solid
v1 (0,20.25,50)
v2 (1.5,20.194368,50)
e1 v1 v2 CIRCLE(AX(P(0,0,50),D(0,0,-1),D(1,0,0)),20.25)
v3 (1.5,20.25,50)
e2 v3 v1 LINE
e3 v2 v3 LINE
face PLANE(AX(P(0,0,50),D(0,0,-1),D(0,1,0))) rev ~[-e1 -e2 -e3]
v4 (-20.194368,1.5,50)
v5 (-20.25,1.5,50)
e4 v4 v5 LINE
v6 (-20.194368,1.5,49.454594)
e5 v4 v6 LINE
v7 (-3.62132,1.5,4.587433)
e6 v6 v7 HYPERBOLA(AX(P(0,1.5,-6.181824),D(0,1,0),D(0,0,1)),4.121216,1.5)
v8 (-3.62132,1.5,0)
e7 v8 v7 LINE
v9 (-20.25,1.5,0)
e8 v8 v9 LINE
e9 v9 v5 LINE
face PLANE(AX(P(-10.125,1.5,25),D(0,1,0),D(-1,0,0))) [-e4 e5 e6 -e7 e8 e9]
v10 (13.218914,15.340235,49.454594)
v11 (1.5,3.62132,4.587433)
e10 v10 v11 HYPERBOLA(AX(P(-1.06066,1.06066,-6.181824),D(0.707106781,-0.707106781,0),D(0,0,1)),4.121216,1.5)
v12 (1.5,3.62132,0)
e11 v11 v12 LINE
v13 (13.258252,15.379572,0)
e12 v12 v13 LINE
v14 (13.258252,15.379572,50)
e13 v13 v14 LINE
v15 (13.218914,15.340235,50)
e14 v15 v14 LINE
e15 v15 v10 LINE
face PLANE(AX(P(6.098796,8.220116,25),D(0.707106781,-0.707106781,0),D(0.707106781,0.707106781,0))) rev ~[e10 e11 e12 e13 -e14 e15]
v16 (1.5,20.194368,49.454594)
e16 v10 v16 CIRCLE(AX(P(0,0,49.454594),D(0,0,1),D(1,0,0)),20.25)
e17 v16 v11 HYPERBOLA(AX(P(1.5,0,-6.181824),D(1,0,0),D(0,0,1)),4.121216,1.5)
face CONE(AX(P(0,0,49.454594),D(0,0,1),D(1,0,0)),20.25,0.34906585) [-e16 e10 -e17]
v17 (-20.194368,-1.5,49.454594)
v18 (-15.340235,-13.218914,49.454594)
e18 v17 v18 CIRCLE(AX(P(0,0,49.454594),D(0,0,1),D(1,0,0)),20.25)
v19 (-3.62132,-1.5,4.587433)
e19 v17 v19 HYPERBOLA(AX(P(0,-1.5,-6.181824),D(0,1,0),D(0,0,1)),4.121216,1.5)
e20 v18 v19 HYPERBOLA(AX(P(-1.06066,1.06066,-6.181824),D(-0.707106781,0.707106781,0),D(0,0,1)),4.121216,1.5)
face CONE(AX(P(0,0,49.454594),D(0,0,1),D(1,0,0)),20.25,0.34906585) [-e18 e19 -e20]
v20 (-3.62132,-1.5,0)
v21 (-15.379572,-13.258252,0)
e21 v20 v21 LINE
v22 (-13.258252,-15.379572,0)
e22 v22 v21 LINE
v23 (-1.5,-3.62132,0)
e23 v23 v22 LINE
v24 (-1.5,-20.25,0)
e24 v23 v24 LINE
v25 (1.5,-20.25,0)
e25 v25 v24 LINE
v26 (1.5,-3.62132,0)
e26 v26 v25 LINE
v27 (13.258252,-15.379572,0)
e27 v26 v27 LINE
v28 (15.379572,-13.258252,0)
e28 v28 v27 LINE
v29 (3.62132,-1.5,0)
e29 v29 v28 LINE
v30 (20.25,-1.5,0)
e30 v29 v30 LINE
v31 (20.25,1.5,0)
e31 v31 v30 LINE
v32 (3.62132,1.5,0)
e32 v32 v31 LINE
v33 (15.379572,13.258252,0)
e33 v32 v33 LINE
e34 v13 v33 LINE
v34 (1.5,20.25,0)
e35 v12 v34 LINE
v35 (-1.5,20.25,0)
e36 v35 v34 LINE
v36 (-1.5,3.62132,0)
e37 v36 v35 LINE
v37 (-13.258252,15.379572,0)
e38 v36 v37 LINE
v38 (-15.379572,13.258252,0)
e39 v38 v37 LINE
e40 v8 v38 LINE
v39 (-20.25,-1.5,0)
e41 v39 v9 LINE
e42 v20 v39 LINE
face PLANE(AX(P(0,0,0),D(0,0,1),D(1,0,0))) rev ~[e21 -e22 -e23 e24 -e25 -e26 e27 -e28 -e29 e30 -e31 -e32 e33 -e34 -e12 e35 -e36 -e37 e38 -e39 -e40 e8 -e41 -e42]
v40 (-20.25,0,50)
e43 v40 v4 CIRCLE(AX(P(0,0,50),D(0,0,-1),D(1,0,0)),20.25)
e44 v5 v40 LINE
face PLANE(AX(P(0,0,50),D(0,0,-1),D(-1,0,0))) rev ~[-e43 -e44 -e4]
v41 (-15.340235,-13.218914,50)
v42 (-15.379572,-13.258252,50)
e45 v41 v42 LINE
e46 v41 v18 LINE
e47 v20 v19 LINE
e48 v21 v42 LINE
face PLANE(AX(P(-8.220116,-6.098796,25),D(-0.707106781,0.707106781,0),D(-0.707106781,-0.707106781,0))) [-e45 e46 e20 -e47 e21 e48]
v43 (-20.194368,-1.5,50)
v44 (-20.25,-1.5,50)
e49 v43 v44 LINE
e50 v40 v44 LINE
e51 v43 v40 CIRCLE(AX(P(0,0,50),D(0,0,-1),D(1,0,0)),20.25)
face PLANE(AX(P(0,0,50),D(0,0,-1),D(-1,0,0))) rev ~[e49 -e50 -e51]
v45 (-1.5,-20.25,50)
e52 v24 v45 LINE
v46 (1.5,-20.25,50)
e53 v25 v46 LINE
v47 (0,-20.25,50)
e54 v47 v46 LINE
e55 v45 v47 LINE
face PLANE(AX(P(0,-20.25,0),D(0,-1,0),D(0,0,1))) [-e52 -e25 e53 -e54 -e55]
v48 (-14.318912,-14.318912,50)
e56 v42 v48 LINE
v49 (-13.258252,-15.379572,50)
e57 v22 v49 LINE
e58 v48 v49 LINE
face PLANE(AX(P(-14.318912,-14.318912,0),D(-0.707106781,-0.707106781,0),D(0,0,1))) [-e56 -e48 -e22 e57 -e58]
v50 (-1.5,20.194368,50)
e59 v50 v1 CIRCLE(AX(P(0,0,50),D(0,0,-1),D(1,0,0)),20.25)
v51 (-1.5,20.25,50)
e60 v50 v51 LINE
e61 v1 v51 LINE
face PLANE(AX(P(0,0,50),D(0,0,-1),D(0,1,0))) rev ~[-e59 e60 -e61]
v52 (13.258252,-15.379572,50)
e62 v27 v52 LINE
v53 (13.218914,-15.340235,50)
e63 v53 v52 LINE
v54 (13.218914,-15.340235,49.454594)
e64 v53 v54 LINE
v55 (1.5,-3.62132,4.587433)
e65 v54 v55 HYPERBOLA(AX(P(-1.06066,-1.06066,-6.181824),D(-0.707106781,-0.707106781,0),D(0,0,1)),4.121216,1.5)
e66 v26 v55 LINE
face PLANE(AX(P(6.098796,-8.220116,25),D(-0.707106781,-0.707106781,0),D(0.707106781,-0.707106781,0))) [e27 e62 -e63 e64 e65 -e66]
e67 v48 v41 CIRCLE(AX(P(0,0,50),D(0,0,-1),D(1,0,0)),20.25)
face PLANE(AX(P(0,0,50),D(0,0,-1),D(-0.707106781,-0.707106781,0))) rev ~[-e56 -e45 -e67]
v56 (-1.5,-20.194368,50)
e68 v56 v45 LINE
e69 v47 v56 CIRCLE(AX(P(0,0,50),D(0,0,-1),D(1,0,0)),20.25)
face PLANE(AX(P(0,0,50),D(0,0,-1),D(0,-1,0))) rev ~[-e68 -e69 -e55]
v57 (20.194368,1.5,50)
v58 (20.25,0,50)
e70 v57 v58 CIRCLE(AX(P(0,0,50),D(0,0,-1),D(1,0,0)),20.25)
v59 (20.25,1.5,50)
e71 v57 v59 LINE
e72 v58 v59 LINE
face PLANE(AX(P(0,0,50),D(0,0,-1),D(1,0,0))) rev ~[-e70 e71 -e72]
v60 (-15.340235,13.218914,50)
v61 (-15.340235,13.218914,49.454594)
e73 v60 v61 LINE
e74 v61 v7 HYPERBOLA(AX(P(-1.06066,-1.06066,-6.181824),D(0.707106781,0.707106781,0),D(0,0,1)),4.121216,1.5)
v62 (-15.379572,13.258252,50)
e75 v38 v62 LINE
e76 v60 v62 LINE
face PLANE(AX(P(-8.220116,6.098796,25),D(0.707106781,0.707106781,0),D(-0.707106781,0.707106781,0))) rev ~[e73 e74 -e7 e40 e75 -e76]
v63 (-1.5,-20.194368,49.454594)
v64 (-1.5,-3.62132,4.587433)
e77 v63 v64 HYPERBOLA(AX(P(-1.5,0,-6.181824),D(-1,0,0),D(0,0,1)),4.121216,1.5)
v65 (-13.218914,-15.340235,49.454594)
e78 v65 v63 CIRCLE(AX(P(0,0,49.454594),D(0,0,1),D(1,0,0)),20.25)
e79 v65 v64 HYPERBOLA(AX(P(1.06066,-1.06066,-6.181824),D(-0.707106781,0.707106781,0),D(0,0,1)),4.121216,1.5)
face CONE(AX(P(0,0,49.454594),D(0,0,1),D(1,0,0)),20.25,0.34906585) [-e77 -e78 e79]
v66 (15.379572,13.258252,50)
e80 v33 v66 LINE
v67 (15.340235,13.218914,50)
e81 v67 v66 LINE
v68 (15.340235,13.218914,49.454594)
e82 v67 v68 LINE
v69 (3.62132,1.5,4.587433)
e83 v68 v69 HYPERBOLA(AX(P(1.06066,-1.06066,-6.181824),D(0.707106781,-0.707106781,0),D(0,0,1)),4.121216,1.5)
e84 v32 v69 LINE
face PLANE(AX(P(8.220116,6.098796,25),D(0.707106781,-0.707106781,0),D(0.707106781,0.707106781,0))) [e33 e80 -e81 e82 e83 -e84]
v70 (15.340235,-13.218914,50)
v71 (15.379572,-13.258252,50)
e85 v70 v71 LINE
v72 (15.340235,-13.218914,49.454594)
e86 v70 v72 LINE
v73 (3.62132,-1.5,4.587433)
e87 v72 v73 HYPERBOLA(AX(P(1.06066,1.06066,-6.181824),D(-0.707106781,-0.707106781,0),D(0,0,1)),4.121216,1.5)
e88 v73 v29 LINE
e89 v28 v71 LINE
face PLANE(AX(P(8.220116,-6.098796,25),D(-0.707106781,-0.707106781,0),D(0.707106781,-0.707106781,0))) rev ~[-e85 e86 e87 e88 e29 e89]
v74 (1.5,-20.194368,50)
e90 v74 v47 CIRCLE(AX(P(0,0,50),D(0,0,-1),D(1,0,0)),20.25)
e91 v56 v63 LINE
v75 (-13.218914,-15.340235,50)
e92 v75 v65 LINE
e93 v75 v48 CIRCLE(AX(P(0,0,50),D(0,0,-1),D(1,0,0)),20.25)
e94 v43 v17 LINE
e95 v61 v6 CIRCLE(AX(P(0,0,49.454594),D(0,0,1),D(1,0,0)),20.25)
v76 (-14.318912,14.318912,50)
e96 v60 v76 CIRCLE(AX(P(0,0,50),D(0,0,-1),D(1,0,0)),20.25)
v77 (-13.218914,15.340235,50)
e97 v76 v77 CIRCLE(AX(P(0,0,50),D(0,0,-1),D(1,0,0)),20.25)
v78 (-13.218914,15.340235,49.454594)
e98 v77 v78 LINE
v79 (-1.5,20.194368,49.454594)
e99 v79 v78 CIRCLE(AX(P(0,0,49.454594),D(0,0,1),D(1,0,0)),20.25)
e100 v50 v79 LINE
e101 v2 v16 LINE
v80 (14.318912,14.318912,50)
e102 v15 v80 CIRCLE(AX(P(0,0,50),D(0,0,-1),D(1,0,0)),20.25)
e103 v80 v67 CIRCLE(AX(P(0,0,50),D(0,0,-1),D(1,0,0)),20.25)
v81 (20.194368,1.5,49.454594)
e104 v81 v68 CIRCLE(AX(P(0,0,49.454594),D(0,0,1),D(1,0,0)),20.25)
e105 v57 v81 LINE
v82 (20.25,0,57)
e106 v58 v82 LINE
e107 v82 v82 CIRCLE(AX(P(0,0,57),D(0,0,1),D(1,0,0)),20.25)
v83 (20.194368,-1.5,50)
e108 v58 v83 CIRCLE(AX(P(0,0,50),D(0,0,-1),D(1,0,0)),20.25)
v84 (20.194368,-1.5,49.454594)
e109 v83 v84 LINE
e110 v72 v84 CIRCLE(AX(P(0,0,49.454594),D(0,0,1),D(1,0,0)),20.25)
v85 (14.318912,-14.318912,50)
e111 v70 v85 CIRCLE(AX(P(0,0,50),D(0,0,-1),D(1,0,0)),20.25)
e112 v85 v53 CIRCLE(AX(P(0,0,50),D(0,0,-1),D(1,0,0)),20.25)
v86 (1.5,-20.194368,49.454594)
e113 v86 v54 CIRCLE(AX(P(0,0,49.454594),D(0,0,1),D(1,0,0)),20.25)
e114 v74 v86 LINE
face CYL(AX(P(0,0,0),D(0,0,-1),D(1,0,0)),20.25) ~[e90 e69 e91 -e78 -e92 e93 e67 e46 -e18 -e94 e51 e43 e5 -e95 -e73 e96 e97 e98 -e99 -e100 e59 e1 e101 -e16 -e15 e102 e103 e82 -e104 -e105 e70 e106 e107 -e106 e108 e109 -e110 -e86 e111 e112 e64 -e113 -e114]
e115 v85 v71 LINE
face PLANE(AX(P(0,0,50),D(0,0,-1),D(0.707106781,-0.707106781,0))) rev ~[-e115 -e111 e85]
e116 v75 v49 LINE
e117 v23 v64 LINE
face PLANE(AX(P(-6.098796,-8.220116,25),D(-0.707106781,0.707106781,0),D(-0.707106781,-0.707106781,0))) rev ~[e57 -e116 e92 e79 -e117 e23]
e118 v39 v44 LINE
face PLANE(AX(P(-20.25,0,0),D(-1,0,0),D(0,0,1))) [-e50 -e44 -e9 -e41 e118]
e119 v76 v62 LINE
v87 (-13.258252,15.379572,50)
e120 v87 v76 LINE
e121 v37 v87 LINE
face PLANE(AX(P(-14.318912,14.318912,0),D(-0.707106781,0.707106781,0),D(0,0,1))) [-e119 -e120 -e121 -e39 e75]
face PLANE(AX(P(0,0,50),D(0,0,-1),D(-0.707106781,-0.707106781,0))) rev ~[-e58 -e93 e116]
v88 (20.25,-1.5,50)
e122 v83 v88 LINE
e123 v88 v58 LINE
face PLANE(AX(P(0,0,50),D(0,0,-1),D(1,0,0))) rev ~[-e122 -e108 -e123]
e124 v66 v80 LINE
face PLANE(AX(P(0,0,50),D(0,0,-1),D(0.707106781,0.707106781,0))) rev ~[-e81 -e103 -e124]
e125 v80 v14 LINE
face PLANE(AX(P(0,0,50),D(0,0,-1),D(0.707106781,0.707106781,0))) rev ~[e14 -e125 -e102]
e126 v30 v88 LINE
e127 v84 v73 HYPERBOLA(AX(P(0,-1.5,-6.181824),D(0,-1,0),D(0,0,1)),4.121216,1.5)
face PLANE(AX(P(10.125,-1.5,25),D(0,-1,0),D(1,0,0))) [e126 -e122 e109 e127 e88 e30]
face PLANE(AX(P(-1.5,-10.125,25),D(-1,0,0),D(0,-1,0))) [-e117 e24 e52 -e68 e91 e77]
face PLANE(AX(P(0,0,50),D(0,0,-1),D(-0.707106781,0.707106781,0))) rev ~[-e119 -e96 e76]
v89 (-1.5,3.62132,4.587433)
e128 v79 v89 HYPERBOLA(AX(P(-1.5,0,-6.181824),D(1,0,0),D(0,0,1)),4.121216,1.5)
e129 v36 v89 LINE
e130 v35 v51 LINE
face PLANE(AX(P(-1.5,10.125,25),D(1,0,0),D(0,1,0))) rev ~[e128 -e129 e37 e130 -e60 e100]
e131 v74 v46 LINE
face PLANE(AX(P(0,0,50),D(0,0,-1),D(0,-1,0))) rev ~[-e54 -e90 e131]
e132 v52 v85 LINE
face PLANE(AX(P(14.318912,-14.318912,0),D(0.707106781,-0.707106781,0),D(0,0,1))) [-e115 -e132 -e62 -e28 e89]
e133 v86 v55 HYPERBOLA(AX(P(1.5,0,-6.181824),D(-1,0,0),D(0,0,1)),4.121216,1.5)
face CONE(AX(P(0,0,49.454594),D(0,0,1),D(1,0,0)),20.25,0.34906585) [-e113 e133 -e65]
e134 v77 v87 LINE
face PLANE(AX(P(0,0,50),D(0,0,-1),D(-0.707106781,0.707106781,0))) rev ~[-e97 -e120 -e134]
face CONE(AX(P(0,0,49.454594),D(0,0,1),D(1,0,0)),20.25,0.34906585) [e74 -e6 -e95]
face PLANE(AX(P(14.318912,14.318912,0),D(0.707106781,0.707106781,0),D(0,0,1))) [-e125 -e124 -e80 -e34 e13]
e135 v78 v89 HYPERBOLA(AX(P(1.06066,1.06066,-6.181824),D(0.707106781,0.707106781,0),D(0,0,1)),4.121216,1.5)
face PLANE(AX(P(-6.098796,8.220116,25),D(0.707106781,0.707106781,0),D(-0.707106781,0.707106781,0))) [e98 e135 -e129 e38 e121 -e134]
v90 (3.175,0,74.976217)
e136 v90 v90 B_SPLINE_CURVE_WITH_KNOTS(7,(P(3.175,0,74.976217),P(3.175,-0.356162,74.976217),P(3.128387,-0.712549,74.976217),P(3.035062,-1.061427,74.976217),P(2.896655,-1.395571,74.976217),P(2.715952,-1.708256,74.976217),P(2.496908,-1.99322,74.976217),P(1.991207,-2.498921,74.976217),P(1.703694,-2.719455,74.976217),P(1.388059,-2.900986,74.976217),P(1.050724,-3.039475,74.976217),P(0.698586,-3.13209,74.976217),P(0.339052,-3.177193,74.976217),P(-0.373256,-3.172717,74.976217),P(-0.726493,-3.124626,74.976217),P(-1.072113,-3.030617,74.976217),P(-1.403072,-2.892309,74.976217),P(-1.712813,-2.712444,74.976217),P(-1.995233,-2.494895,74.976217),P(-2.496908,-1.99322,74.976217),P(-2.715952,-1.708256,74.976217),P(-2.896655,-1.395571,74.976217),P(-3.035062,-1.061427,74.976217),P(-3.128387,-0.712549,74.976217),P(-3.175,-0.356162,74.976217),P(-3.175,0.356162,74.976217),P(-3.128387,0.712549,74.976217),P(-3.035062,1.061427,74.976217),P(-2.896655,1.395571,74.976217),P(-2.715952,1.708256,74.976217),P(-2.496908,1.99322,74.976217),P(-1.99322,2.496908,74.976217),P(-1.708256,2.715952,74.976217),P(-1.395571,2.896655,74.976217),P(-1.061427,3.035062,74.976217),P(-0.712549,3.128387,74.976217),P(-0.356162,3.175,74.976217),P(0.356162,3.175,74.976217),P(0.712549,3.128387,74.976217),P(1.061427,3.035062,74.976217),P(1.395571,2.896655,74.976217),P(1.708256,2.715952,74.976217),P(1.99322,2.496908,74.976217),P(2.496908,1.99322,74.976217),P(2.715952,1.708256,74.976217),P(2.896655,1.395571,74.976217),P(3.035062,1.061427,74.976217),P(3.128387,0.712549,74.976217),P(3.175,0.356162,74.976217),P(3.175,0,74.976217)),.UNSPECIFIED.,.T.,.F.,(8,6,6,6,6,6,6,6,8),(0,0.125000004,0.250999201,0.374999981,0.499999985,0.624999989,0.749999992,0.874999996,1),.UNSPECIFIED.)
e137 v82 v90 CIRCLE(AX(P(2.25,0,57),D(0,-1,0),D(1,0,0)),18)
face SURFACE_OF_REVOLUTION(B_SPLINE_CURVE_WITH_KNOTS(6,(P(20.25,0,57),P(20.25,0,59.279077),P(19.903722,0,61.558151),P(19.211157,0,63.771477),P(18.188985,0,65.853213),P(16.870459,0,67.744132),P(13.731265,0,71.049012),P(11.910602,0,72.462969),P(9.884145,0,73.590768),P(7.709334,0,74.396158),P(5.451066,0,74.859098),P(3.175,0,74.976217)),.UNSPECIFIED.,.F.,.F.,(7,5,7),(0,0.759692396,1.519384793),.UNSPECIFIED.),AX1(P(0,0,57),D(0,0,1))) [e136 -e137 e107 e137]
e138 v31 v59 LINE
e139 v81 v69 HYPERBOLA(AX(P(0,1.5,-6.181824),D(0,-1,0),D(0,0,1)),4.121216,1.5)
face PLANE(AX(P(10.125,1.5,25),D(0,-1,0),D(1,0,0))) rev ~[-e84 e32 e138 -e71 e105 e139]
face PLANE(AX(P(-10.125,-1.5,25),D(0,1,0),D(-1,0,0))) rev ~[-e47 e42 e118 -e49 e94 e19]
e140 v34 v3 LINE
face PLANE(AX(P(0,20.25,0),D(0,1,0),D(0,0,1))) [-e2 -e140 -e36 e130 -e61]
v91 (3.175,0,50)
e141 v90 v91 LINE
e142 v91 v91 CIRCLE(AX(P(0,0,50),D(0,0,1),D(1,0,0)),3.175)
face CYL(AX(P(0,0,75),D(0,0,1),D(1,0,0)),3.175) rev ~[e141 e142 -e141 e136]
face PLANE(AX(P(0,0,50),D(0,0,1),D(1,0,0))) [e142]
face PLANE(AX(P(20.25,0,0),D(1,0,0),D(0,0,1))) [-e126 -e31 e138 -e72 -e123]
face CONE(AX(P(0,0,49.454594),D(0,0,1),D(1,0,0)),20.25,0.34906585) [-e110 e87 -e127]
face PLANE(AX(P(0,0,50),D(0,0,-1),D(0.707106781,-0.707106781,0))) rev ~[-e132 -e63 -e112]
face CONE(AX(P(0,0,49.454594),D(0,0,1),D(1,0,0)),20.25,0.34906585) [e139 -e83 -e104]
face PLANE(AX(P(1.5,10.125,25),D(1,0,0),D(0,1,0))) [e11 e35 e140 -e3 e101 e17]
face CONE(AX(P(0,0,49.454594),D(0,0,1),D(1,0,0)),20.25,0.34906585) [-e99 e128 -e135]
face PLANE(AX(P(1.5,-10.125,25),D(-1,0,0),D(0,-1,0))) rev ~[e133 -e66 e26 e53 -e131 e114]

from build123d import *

# Parameters (mm, degrees)
F0_R      = 20.25
F1_DEPTH  = 75
F2_SIZE2  = 49.4545935502
F2_SIZE   = 18
F3_R      = 18
F7_E11_W  = 20.25
F7_E11_H  = 50
F14_DEPTH = 1.5
F9_E17_W  = 20.25
F9_E17_H  = 50
F15_DEPTH = 1.5
F9_E13_W  = 20.25
F9_E13_H  = 50
F16_DEPTH = 1.5
F11_E21_W = 20.25
F11_E21_H = 50
F17_DEPTH = 1.5
F11_E20_W = 20.25
F11_E20_H = 50
F18_DEPTH = 1.5
F13_E23_W = 20.25
F13_E23_H = 50
F19_DEPTH = 1.5
F5_E6_W   = 20.25
F5_E6_H   = 50
F20_DEPTH = 1.5
F13_E24_W = 20.25
F13_E24_H = 50
F21_DEPTH = 1.5
F22_R     = 3.175
F22_R_2   = 2.25
F23_DEPTH = 25


with BuildPart() as f1:
    # F0 (on Top) → F1 (new body)
    with BuildSketch(Plane.XY):
        Circle(F0_R)
    extrude(amount=F1_DEPTH)

    # F2
    f2_edges = [f1.edges().sort_by_distance(p)[0] for p in [
        (-20.25, 0, 0),
    ]]
    f2_side = f1.faces().sort_by_distance((0, 0, 0))[0]
    chamfer(f2_edges, length=F2_SIZE, length2=F2_SIZE2, reference=f2_side)

    # F3
    f3_edges = [f1.edges().sort_by_distance(p)[0] for p in [
        (-20.25, 0, 75),
    ]]
    fillet(f3_edges, radius=F3_R)

    # F7_E11 (on explicit) → F14 (join, symmetric)
    with BuildSketch(Plane.YZ):
        with Locations((10.125, 25)):
            Rectangle(F7_E11_W, F7_E11_H)
    extrude(amount=F14_DEPTH, both=True)

    # F9_E17 (on explicit) → F15 (join, symmetric)
    with BuildSketch(Plane(origin=(0, 0, 0), x_dir=(-0.7071067812, 0.7071067812, 0), z_dir=(0.7071067812, 0.7071067812, 0))):
        with Locations((10.125, 25)):
            Rectangle(F9_E17_W, F9_E17_H)
    extrude(amount=F15_DEPTH, both=True)

    # F9_E13 (on explicit) → F16 (join, symmetric)
    with BuildSketch(Plane(origin=(0, 0, 0), x_dir=(-1, 0, 0), z_dir=(0, 1, 0))):
        with Locations((10.125, 25)):
            Rectangle(F9_E13_W, F9_E13_H)
    extrude(amount=F16_DEPTH, both=True)

    # F11_E21 (on explicit) → F17 (join, symmetric)
    with BuildSketch(Plane(origin=(0, 0, 0), x_dir=(-0.7071067812, -0.7071067812, 0), z_dir=(-0.7071067812, 0.7071067812, 0))):
        with Locations((10.125, 25)):
            Rectangle(F11_E21_W, F11_E21_H)
    extrude(amount=F17_DEPTH, both=True)

    # F11_E20 (on explicit) → F18 (join, symmetric)
    with BuildSketch(Plane(origin=(0, 0, 0), x_dir=(0, -1, 0), z_dir=(-1, 0, 0))):
        with Locations((10.125, 25)):
            Rectangle(F11_E20_W, F11_E20_H)
    extrude(amount=F18_DEPTH, both=True)

    # F13_E23 (on explicit) → F19 (join, symmetric)
    with BuildSketch(Plane.XZ):
        with Locations((10.125, 25)):
            Rectangle(F13_E23_W, F13_E23_H)
    extrude(amount=F19_DEPTH, both=True)

    # F5_E6 (on explicit) → F20 (join, symmetric)
    with BuildSketch(Plane(origin=(0, 0, 0), x_dir=(0.7071067812, -0.7071067812, 0), z_dir=(-0.7071067812, -0.7071067812, 0))):
        with Locations((10.125, 25)):
            Rectangle(F5_E6_W, F5_E6_H)
    extrude(amount=F20_DEPTH, both=True)

    # F13_E24 (on explicit) → F21 (join, symmetric)
    with BuildSketch(Plane(origin=(0, 0, 0), x_dir=(0.7071067812, 0.7071067812, 0), z_dir=(0.7071067812, -0.7071067812, 0))):
        with Locations((10.125, 25)):
            Rectangle(F13_E24_W, F13_E24_H)
    extrude(amount=F21_DEPTH, both=True)

    # F22 (on face) → F23 (cut)
    with BuildSketch(Plane.XY.offset(75)):
        Circle(F22_R)
        Circle(F22_R_2, mode=Mode.SUBTRACT)
        Circle(F22_R_2)
    extrude(amount=-F23_DEPTH, mode=Mode.SUBTRACT)


solid = f1.part
